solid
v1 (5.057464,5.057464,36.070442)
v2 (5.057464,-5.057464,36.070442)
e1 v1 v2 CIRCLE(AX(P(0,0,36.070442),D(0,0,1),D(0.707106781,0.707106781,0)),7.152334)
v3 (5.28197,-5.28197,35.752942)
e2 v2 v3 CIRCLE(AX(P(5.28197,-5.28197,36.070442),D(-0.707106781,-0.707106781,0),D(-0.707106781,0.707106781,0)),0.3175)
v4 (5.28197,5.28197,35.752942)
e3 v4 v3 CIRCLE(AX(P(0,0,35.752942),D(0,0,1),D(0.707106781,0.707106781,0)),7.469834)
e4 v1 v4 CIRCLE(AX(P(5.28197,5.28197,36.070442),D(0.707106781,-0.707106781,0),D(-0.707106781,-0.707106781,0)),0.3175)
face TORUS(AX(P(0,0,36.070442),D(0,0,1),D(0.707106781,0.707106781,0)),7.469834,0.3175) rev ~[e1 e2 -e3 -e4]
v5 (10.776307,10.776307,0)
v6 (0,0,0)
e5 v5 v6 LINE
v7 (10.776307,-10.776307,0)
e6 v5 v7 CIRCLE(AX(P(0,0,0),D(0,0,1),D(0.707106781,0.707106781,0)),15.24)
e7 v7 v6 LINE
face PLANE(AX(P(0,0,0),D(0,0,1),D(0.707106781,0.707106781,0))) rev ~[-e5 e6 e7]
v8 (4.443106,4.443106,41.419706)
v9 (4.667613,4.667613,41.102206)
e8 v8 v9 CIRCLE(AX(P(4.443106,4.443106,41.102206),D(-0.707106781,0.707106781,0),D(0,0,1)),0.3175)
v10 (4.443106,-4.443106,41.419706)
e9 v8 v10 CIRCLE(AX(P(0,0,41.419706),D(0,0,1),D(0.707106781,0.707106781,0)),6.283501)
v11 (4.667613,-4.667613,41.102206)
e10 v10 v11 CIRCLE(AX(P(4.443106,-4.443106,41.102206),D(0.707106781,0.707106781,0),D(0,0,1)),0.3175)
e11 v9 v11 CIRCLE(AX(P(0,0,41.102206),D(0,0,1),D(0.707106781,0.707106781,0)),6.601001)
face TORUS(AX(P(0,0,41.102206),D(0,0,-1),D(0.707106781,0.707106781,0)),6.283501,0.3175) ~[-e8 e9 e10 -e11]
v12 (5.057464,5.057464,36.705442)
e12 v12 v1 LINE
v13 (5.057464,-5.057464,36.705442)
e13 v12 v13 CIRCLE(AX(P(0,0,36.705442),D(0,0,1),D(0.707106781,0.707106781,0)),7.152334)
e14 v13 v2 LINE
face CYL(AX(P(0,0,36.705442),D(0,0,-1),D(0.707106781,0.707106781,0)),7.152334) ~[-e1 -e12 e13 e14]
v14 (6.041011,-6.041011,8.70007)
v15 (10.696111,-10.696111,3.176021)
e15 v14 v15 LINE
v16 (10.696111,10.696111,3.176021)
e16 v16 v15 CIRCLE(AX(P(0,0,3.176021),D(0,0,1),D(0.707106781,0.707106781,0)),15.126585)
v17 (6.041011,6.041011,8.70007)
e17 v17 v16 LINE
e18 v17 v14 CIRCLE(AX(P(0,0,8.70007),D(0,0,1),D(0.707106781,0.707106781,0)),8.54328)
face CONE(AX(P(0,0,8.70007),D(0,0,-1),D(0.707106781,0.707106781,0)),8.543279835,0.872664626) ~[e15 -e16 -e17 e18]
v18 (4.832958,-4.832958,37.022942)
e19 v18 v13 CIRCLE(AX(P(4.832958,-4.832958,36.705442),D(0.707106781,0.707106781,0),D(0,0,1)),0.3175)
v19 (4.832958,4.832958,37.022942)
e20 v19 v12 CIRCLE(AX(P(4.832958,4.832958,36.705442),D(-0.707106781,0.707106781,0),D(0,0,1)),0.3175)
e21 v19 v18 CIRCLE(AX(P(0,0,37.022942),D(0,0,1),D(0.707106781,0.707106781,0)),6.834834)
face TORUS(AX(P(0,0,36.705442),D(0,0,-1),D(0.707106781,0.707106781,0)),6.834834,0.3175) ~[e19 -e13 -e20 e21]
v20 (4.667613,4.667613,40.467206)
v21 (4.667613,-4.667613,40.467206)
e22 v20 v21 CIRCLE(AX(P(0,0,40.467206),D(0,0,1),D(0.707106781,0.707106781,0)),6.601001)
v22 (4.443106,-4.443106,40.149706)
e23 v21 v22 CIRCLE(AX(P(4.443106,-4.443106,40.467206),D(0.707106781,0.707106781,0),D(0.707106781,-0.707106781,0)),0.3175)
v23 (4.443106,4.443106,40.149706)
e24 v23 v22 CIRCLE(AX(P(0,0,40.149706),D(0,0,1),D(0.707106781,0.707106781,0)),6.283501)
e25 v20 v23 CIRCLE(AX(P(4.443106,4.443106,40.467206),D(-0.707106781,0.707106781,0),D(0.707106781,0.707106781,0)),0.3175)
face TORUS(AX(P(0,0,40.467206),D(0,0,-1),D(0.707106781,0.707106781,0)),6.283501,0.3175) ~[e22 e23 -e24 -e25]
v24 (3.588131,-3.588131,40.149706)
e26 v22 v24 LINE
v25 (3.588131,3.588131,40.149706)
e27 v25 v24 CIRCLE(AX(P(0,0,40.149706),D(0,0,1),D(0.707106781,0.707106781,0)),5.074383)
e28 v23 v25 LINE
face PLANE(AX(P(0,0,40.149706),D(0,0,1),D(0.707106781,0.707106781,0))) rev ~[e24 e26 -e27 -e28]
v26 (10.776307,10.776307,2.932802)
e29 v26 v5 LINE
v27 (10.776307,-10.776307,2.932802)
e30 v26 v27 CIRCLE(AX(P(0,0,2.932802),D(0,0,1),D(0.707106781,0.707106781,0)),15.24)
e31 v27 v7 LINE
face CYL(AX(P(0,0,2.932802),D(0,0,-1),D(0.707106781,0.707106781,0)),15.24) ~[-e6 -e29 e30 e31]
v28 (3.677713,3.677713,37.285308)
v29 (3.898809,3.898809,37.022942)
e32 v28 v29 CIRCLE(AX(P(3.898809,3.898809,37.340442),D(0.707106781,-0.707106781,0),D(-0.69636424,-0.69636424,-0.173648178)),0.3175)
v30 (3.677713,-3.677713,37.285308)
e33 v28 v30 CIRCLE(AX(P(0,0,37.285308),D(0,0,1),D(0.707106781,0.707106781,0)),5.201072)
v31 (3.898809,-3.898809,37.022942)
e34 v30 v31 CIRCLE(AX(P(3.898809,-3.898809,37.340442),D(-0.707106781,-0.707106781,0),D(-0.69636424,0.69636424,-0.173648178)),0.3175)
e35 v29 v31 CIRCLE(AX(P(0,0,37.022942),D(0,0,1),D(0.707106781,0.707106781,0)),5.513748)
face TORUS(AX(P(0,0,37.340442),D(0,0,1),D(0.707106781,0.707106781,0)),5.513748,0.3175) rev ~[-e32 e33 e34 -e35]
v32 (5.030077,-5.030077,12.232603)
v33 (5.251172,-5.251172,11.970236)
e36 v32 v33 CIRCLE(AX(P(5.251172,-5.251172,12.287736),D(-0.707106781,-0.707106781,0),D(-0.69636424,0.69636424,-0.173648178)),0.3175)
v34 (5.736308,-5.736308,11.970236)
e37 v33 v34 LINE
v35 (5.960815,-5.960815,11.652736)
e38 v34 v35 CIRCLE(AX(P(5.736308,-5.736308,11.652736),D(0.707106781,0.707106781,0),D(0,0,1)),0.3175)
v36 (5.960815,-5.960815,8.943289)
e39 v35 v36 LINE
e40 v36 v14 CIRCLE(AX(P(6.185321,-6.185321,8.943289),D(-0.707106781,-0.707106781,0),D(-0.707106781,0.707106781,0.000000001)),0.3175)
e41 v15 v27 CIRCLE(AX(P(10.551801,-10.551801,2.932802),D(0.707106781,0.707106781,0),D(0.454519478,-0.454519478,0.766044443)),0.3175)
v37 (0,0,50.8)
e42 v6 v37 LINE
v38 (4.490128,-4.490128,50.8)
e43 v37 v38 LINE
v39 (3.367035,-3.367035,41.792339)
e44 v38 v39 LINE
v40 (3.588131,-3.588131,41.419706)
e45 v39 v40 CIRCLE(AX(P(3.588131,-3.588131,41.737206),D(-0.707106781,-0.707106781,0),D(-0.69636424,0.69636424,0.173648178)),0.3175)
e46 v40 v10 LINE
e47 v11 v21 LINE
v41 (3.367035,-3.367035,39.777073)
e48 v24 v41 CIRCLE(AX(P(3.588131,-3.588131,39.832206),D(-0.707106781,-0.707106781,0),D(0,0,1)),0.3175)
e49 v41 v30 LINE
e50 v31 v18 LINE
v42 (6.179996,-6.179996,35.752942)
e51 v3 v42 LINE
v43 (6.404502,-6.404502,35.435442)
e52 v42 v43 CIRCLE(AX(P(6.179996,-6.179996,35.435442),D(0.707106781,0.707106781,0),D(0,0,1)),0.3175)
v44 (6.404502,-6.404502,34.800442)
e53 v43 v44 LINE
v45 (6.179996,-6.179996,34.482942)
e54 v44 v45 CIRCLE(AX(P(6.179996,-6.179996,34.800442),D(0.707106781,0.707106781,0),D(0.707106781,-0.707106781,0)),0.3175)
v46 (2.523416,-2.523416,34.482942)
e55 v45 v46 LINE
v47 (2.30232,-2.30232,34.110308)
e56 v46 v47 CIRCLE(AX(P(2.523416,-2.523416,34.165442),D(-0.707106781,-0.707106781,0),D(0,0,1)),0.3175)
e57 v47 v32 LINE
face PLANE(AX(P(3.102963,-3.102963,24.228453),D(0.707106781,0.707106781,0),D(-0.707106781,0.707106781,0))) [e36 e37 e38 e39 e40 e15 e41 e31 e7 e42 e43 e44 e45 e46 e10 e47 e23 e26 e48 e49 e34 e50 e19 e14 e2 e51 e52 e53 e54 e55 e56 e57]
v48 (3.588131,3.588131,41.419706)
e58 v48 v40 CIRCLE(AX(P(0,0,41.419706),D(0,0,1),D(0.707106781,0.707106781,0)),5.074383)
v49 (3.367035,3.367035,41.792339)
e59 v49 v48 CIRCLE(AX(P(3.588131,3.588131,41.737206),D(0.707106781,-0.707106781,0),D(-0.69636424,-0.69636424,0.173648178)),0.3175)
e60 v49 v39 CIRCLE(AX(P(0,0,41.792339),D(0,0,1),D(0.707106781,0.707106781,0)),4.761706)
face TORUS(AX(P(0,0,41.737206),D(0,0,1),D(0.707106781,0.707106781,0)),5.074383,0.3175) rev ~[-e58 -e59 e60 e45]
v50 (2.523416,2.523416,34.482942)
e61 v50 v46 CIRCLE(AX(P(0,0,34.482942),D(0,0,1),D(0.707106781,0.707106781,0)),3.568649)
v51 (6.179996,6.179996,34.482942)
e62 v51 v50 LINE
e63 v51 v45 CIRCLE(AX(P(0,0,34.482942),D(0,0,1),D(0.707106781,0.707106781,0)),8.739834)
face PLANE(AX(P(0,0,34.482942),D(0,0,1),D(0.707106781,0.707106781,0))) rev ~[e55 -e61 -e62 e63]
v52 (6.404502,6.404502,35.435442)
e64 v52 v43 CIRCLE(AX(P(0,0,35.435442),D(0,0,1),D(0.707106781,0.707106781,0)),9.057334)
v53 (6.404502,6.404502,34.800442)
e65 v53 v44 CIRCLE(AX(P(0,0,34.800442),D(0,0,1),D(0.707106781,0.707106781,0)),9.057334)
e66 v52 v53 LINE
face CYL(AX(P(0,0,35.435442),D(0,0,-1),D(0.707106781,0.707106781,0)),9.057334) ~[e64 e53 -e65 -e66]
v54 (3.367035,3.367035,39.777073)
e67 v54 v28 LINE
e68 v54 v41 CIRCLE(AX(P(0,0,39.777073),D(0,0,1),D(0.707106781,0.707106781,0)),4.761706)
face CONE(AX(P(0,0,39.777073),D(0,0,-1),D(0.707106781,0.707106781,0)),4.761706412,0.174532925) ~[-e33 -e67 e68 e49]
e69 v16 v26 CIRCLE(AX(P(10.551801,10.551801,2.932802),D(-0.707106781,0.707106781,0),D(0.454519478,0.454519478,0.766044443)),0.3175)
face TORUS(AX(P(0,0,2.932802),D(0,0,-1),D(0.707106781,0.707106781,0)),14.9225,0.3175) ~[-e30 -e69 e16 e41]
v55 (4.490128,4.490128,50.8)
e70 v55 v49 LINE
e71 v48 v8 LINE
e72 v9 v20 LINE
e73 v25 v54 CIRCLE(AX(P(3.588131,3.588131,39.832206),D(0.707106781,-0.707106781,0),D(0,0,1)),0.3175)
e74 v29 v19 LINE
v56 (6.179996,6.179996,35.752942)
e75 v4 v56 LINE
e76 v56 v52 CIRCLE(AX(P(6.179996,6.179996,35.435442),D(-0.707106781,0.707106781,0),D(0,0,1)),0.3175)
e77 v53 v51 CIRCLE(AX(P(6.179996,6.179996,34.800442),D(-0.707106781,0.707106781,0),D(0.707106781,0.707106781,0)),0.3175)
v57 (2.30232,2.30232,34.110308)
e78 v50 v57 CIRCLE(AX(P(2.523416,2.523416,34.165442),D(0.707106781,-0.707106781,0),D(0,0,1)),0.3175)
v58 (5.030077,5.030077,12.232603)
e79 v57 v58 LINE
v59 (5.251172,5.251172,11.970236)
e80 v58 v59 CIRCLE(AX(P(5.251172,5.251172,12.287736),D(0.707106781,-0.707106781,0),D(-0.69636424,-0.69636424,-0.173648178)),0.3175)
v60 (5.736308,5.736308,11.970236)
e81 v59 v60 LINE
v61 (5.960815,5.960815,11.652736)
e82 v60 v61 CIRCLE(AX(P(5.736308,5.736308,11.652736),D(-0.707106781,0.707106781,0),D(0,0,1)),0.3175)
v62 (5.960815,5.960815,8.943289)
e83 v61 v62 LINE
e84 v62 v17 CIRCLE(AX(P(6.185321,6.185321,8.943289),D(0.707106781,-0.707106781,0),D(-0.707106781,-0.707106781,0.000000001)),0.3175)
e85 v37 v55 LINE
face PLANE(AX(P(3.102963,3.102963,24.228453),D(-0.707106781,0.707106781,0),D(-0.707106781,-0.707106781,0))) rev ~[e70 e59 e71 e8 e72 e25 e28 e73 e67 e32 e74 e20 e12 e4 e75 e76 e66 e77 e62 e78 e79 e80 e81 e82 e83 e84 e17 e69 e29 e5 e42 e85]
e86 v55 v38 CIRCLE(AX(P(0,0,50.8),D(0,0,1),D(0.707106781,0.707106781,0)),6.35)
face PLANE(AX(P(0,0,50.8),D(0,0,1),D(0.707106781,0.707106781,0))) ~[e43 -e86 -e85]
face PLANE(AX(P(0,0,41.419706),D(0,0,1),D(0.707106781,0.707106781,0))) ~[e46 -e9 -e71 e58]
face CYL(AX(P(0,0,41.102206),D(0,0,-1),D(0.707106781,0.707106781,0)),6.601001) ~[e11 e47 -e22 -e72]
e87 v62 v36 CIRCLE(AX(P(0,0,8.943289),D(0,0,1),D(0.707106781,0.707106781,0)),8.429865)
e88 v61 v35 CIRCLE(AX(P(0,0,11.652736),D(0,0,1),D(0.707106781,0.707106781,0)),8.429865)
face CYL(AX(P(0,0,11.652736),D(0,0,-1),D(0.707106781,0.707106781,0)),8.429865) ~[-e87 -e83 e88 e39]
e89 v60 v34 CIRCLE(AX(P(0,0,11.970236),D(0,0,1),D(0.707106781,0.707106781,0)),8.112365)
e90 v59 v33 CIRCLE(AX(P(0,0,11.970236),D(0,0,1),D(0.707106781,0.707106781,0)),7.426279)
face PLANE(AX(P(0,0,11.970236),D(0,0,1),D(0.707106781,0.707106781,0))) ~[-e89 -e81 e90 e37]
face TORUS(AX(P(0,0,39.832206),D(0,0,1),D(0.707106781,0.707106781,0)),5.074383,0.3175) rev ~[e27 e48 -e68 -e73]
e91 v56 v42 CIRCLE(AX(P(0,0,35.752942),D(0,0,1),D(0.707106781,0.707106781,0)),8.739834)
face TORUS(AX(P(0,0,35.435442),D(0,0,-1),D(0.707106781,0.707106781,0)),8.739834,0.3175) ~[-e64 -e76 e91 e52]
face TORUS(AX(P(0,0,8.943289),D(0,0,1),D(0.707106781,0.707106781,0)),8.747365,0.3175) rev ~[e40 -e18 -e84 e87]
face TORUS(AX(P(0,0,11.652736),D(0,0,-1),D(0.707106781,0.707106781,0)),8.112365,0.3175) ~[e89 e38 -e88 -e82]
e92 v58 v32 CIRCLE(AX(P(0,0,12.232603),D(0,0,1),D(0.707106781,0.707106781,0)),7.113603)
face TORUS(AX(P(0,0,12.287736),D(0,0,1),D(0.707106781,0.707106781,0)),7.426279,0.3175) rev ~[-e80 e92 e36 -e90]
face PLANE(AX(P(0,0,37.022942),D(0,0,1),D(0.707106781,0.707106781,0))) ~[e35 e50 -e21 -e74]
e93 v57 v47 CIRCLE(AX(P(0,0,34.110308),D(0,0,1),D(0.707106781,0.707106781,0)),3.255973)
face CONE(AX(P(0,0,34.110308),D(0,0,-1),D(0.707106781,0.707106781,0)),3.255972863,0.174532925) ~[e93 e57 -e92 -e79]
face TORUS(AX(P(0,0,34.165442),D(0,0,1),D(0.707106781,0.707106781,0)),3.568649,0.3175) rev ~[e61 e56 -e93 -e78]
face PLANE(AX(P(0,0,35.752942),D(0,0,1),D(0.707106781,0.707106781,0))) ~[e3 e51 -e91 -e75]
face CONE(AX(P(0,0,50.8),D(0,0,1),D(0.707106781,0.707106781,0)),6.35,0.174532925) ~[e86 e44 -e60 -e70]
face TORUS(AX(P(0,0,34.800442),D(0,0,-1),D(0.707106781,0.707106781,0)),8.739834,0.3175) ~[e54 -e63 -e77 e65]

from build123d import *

# Parameters (mm, degrees)
F1_ANGLE_BACK = 135
F1_ANGLE      = 270


# Not quite as in the source:
# - a feature of the source that left no trace in its solid (it failed there, or was rolled back) is left out


with BuildPart() as f1:
    # F0 (on Front) → F1 (revolve)
    with BuildSketch(Plane.XZ, mode=Mode.PRIVATE) as f1_sk:
        with BuildLine():
            Line((-15.24, 0), (0, 0))
            Line((0, 0), (0, 50.8))
            Line((0, 50.8), (-6.35, 50.8))
            Line((-6.35, 50.8), (-4.7617064118, 41.792339449))
            ThreePointArc((-4.7617064118, 41.792339449), (-4.8311637627, 41.5331210865), (-5.0743828734, 41.4197061526))
            Line((-5.0743828734, 41.4197061526), (-6.2835011077, 41.4197061526))
            ThreePointArc((-6.2835011077, 41.4197061526), (-6.5080075107, 41.3267125556), (-6.6010011077, 41.1022061526))
            Line((-6.6010011077, 41.1022061526), (-6.6010011077, 40.4672061526))
            ThreePointArc((-6.6010011077, 40.4672061526), (-6.5080075107, 40.2426997495), (-6.2835011077, 40.1497061526))
            Line((-6.2835011077, 40.1497061526), (-5.0743828734, 40.1497061526))
            ThreePointArc((-5.0743828734, 40.1497061526), (-4.8311637627, 40.0362912186), (-4.7617064118, 39.7770728561))
            Line((-4.7617064118, 39.7770728561), (-5.2010717431, 37.2853082403))
            ThreePointArc((-5.2010717431, 37.2853082403), (-5.3096631386, 37.0972224261), (-5.5137482047, 37.0229415367))
            Line((-5.5137482047, 37.0229415367), (-6.8348340718, 37.0229415367))
            ThreePointArc((-6.8348340718, 37.0229415367), (-7.0593404748, 36.9299479398), (-7.1523340718, 36.7054415367))
            Line((-7.1523340718, 36.7054415367), (-7.1523340718, 36.0704415367))
            ThreePointArc((-7.1523340718, 36.0704415367), (-7.2453276688, 35.8459351337), (-7.4698340718, 35.7529415367))
            Line((-7.4698340718, 35.7529415367), (-8.7398340718, 35.7529415367))
            ThreePointArc((-8.7398340718, 35.7529415367), (-8.9643404748, 35.6599479398), (-9.0573340718, 35.4354415367))
            Line((-9.0573340718, 35.4354415367), (-9.0573340718, 34.8004415367))
            ThreePointArc((-9.0573340718, 34.8004415367), (-8.9643404748, 34.5759351337), (-8.7398340718, 34.4829415367))
            Line((-8.7398340718, 34.4829415367), (-3.5686493249, 34.4829415367))
            ThreePointArc((-3.5686493249, 34.4829415367), (-3.3254302142, 34.3695266028), (-3.2559728633, 34.1103082403))
            Line((-3.2559728633, 34.1103082403), (-7.113602572, 12.2326030065))
            ThreePointArc((-7.113602572, 12.2326030065), (-7.2221939675, 12.0445171922), (-7.4262790336, 11.9702363029))
            Line((-7.4262790336, 11.9702363029), (-8.1123649007, 11.9702363029))
            ThreePointArc((-8.1123649007, 11.9702363029), (-8.3368713037, 11.8772427059), (-8.4298649007, 11.6527363029))
            Line((-8.4298649007, 11.6527363029), (-8.4298649007, 8.9432889844))
            ThreePointArc((-8.4298649007, 8.9432889844), (-8.4596121783, 8.8091076862), (-8.5432798346, 8.7000698737))
            Line((-8.5432798346, 8.7000698737), (-15.1265850661, 3.176020882))
            ThreePointArc((-15.1265850661, 3.176020882), (-15.2102527224, 3.0669830694), (-15.24, 2.9328017713))
            Line((-15.24, 2.9328017713), (-15.24, 0))
        make_face()
    revolve(f1_sk.sketch.rotate(Axis((0, 0, 25.4), (0, 0, 1)), -F1_ANGLE_BACK), axis=Axis((0, 0, 25.4), (0, 0, 1)), revolution_arc=F1_ANGLE)


solid = f1.part
